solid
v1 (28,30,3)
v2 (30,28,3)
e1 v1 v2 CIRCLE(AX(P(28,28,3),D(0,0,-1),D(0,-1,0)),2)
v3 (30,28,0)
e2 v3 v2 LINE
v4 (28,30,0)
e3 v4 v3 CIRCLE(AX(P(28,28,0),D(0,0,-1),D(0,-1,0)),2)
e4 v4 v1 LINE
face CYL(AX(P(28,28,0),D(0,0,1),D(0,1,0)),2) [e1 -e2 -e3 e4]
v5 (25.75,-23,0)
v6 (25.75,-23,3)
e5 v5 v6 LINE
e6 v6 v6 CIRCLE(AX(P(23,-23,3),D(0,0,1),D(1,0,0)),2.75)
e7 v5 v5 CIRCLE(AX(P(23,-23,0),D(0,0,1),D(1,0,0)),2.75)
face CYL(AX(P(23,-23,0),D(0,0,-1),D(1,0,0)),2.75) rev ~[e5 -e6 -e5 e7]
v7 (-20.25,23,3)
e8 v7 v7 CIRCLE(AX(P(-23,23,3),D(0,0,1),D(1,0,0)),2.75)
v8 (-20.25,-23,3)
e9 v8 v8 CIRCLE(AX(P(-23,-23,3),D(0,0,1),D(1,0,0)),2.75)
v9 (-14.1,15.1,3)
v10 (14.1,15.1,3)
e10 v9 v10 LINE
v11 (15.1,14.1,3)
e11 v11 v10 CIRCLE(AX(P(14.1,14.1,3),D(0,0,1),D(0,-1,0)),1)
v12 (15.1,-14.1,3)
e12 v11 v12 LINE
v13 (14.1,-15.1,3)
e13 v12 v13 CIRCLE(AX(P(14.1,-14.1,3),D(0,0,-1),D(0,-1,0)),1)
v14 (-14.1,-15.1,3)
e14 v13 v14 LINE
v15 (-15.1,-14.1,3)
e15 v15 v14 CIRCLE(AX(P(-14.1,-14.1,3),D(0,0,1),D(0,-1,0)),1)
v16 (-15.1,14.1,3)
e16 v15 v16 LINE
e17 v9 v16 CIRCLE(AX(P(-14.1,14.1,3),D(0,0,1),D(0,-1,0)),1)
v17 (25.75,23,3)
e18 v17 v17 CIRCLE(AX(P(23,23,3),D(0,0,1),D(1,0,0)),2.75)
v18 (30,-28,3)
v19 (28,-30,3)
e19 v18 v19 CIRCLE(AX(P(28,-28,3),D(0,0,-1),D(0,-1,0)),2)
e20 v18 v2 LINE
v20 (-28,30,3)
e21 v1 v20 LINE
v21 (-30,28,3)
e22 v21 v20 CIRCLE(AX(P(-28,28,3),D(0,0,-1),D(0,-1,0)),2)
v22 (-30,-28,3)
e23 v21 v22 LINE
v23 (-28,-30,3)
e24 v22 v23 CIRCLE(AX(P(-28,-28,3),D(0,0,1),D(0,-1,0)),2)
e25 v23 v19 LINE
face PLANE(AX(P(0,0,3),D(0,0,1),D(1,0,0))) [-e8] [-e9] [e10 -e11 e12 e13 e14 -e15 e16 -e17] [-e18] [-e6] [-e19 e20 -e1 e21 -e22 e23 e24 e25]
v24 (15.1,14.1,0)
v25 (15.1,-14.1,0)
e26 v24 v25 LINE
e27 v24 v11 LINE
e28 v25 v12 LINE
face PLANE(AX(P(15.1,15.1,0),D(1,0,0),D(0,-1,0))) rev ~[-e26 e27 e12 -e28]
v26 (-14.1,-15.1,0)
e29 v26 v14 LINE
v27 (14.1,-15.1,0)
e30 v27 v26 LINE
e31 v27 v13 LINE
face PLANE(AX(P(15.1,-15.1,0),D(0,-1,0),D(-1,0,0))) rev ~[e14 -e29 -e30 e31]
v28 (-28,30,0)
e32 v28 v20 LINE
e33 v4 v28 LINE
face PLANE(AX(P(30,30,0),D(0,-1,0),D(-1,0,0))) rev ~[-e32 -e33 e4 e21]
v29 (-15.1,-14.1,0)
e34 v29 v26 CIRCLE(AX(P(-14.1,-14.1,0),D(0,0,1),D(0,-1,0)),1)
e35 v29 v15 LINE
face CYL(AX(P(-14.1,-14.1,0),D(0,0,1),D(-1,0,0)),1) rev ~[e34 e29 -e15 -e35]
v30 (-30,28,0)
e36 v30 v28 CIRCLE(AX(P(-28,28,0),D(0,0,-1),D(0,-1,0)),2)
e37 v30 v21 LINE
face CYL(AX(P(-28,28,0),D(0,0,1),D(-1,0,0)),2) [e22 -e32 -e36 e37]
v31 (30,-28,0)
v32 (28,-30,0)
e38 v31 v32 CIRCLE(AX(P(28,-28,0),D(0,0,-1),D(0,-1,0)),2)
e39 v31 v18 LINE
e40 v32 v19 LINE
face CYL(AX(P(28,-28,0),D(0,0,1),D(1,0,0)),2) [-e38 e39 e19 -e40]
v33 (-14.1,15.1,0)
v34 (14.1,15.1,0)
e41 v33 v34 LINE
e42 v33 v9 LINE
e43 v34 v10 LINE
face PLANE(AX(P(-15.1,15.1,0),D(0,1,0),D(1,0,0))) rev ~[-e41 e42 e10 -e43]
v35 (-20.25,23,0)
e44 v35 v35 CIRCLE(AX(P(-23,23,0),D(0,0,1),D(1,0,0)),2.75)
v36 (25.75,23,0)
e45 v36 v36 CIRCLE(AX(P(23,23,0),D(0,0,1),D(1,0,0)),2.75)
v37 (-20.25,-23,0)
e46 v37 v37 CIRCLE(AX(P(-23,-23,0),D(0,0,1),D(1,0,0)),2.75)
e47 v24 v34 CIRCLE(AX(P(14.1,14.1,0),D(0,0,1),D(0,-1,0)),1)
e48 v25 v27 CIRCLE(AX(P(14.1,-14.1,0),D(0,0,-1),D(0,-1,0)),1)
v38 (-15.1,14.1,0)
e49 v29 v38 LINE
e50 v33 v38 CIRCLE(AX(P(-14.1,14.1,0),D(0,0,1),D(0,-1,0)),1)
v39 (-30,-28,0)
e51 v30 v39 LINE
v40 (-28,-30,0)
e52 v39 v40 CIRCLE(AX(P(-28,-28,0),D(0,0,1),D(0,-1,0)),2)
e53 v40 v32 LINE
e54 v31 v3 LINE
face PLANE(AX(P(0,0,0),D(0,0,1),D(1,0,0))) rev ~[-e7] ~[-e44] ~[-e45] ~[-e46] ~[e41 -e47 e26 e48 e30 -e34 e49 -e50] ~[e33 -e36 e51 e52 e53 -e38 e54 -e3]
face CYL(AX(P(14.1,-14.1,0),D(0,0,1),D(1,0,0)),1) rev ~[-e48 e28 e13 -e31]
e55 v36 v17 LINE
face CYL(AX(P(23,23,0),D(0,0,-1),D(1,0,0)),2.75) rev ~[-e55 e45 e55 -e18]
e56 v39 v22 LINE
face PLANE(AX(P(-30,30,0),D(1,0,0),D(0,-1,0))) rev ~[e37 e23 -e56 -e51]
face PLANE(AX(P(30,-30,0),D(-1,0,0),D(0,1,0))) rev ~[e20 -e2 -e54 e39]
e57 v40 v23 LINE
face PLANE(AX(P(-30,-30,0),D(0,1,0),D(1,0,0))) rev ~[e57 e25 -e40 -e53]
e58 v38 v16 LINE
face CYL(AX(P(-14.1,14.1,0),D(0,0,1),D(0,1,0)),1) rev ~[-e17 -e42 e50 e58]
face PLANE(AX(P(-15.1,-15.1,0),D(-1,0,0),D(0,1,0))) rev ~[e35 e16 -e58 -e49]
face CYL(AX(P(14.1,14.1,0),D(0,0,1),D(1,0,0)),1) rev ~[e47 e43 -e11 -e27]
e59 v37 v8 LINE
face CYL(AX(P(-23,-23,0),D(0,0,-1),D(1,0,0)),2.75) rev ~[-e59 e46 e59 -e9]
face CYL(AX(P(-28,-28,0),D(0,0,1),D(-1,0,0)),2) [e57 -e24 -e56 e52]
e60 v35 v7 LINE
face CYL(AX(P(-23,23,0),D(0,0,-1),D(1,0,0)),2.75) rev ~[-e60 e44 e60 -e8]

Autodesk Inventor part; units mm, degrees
ref_plane "YZ Plane" through (0, 0, 0) normal (1, 0, 0) x (0, 1, 0)
ref_plane "XZ Plane" through (0, 0, 0) normal (0, 1, 0) x (-1, 0, 0)
ref_plane "XY Plane" through (0, 0, 0) normal (0, 0, 1) x (1, 0, 0)
sketch "Sketch1" plane through (0, 0, 0) normal (0, 0, 1) x (1, 0, 0)
  line L0 (-30, -30) -> (30, -30)
  line L1 (30, -30) -> (30, 30)
  line L2 (30, 30) -> (-30, 30)
  line L3 (-30, 30) -> (-30, -30)
  line L4 (-30, -30) -> (30, 30) construction
  line L5 (30, -30) -> (-30, 30) construction
  line L6 (15.1, -15.1) -> (-15.1, -15.1)
  line L7 (-15.1, -15.1) -> (-15.1, 15.1)
  line L8 (-15.1, 15.1) -> (15.1, 15.1)
  line L9 (15.1, 15.1) -> (15.1, -15.1)
  line L10 (15.1, -15.1) -> (-15.1, 15.1) construction
  line L11 (-15.1, -15.1) -> (15.1, 15.1) construction
  circle A0 centre (-23, -23) radius 2.75
  circle A1 centre (23, -23) radius 2.75
  circle A2 centre (23, 23) radius 2.75
  circle A3 centre (-23, 23) radius 2.75
  line L12 (25.75, 25.75) -> (-25.75, 25.75) construction
  line L13 (-25.75, 25.75) -> (-25.75, -25.75) construction
  line L14 (-25.75, -25.75) -> (25.75, -25.75) construction
  line L15 (25.75, -25.75) -> (25.75, 25.75) construction
  line L16 (25.75, 25.75) -> (-25.75, -25.75) construction
  line L17 (-25.75, 25.75) -> (25.75, -25.75) construction
  line L18 (23, 23) -> (-23, 23) construction
  line L19 (-23, 23) -> (-23, -23) construction
  line L20 (-23, -23) -> (23, -23) construction
  line L21 (23, -23) -> (23, 23) construction
  line L22 (23, 23) -> (-23, -23) construction
  line L23 (-23, 23) -> (23, -23) construction
  point P0 (0, 0)
  dimension "d172" = 30.2
  dimension "d190" = 5.5
  dimension "d191" = 46
  dimension "d192" = 60
extrude "Plate5" add sketch "Sketch1" along normal blind 3
fillet "Corner Round1" radius 2 4 edges at (30, 30, 1.5) (-30, 30, 1.5) (-30, -30, 1.5) (30, -30, 1.5)
fillet "Corner Round2" radius 1 4 edges at (-15.1, 15.1, 1.5) (-15.1, -15.1, 1.5) (15.1, -15.1, 1.5) (15.1, 15.1, 1.5)
properties part number "PRS 940-52-04 FDS Way FLANGE" material "Stainless Steel"
